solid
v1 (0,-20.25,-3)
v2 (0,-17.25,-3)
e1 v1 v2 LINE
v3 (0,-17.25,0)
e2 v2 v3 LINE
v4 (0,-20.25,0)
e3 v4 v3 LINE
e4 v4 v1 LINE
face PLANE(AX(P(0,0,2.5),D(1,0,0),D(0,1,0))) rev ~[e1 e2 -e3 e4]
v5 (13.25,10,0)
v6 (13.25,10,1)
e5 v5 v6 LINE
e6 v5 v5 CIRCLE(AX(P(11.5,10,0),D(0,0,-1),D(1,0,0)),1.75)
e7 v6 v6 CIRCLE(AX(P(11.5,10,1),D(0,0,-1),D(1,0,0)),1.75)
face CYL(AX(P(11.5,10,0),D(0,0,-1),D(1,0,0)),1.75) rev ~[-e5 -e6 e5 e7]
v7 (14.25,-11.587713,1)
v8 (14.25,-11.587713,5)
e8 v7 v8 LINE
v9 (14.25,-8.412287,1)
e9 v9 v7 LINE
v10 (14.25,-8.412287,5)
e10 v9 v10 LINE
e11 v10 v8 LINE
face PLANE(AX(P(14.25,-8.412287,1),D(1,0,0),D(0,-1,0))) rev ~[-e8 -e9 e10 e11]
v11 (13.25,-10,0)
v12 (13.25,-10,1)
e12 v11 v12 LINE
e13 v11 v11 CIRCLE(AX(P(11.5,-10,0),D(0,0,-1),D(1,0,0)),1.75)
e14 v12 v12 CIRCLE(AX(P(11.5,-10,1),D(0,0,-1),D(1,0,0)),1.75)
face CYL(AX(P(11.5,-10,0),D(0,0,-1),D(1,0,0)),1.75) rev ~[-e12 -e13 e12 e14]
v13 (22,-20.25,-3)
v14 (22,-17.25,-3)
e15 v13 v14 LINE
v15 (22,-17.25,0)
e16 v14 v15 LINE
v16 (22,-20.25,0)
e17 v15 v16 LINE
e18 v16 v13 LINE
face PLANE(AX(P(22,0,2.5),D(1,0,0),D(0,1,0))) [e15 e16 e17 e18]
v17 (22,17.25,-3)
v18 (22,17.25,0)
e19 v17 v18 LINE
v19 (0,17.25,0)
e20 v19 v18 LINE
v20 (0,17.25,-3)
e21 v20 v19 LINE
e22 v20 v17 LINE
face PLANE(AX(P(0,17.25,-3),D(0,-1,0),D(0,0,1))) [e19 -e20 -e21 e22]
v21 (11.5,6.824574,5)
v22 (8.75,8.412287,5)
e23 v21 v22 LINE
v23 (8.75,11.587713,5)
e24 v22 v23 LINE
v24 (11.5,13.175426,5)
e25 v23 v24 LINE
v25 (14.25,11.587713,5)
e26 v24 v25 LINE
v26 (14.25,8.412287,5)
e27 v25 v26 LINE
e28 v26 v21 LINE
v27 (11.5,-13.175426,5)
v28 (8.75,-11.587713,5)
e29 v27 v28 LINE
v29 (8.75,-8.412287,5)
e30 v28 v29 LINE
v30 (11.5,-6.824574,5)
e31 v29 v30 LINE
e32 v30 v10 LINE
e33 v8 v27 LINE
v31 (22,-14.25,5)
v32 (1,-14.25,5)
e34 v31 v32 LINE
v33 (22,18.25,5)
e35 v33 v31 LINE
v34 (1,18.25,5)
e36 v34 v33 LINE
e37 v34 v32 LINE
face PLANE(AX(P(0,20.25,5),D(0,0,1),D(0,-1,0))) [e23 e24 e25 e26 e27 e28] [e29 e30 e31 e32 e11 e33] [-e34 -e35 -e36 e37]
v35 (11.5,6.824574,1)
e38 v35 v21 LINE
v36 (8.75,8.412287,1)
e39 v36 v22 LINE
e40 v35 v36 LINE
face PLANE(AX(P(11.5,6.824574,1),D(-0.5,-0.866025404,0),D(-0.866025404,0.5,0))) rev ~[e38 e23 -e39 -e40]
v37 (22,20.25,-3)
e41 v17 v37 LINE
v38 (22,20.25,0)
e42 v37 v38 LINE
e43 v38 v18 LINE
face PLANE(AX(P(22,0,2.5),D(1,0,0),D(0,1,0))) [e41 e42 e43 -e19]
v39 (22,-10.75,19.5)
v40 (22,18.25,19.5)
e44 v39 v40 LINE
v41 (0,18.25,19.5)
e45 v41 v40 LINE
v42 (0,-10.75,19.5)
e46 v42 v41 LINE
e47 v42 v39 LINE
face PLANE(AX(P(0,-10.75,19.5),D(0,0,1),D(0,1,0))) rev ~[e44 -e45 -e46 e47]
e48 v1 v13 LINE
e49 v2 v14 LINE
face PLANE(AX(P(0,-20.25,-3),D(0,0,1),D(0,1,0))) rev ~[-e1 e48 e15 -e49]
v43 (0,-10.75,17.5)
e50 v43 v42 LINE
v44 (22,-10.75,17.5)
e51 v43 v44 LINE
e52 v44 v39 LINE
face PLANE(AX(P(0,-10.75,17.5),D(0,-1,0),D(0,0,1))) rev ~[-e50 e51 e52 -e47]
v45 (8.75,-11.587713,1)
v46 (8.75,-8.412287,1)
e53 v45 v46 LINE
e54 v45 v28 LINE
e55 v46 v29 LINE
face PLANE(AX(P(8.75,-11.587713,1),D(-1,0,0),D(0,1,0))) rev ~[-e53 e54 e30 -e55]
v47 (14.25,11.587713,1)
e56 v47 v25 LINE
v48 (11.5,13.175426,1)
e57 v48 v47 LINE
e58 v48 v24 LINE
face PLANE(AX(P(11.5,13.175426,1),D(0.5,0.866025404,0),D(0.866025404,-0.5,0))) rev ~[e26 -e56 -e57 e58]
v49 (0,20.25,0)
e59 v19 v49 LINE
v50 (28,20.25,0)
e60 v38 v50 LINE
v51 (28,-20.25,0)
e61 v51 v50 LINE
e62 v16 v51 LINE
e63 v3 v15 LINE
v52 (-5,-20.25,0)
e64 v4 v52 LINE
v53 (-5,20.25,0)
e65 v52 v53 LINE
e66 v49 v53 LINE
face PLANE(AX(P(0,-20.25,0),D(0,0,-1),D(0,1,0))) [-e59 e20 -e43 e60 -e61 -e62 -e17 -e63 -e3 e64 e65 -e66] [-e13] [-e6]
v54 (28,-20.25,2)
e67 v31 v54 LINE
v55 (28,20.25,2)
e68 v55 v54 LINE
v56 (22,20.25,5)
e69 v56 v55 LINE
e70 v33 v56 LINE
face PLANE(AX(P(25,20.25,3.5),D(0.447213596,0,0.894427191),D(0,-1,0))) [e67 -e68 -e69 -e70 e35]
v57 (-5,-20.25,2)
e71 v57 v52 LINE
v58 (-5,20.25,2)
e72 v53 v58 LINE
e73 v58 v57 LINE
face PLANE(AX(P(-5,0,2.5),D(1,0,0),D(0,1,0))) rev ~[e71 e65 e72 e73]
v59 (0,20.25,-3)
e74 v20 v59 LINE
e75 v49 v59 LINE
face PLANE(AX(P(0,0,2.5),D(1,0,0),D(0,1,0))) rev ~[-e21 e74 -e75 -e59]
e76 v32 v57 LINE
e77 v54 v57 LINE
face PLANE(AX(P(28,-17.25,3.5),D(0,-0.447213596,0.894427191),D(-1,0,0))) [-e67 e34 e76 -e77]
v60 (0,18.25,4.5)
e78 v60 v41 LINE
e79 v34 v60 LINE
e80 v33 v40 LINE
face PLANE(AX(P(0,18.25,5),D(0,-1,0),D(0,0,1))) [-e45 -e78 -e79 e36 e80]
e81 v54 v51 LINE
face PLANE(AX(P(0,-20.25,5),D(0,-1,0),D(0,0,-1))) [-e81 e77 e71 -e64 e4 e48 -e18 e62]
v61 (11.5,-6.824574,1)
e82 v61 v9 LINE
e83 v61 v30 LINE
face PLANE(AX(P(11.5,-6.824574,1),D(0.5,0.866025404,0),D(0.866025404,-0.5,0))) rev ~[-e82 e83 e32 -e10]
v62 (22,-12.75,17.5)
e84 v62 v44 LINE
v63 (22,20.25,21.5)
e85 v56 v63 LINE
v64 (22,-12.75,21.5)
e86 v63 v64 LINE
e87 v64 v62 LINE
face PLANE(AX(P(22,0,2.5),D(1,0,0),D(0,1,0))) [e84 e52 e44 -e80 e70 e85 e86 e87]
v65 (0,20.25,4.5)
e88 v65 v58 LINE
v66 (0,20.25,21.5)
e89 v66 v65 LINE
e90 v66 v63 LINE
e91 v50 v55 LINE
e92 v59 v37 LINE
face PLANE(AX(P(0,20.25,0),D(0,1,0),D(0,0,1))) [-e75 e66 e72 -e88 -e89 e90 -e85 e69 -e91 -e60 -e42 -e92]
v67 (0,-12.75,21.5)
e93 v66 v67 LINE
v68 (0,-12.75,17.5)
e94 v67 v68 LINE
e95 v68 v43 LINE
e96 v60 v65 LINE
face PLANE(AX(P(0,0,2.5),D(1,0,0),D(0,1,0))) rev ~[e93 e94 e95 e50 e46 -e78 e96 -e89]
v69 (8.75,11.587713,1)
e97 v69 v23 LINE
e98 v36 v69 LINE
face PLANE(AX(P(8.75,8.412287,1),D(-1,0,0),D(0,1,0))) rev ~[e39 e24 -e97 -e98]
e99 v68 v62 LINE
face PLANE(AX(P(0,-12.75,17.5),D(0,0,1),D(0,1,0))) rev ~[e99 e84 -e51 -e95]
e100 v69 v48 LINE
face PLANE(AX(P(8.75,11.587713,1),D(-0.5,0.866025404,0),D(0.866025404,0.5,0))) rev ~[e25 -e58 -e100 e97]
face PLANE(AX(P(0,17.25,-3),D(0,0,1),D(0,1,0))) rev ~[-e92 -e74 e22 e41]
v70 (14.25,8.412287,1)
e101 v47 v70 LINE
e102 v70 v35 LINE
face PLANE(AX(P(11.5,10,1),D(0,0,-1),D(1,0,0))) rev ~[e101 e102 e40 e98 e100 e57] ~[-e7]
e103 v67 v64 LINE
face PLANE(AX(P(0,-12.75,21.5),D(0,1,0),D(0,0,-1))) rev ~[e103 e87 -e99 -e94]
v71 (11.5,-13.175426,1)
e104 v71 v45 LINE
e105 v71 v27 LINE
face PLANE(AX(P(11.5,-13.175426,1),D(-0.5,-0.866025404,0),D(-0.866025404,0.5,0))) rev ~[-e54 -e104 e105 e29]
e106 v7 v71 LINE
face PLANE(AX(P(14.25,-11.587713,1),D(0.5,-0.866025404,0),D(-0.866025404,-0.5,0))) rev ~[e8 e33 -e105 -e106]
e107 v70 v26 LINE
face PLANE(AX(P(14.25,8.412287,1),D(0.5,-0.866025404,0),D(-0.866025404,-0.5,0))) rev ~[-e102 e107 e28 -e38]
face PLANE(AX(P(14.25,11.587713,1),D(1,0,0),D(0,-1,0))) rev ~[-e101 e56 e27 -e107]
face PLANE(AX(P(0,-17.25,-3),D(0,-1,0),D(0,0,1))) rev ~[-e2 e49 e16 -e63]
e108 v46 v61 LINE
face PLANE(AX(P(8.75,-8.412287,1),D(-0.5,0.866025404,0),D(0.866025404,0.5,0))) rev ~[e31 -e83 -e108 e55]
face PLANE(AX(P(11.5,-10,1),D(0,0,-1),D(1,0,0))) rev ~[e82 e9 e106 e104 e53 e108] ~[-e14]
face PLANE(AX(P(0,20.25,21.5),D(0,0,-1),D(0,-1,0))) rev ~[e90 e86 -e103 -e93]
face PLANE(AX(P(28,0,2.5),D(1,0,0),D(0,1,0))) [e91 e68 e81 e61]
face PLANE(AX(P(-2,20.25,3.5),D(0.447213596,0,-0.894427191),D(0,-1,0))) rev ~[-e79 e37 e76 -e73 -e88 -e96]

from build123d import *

# Parameters (mm, degrees)
F0_W          = 2
F0_H          = 14.5
F0_W_2        = 3
F0_H_2        = 3
F0_W_3        = 29
F0_H_3        = 2
F1_DEPTH      = 22
F2_DEPTH      = 28
F2_DEPTH_BACK = 5
F3_R          = 1.75
F4_DEPTH      = 5
F5_START      = -1
F5_DEPTH      = 4
F6_SIZE2      = 3
F6_SIZE       = 6


# Not quite as in the source:
# - a feature names something its author has since deleted; it is built from what else it names


with BuildPart() as f1:
    # F0 (on Right) → F1 (new body)
    with BuildSketch(Plane.YZ):
        Polygon((-20.25, 5), (-20.25, 0), (-17.25, 0), (17.25, 0), (20.25, 0), (20.25, 5), (18.25, 5), align=None)
        with Locations((19.25, 12.25)):
            Rectangle(F0_W, F0_H)
        with Locations((-18.75, -1.5)):
            Rectangle(F0_W_2, F0_H_2)
        with Locations((18.75, -1.5)):
            Rectangle(F0_W_2, F0_H_2)
        with Locations((3.75, 20.5)):
            Rectangle(F0_W_3, F0_H_3)
        with Locations((19.25, 20.5)):
            Rectangle(F0_W, F0_H_3)
        Polygon((-10.75, 17.5), (-10.75, 19.5), (-10.75, 21.5), (-12.75, 21.5), (-12.75, 17.5), align=None)
    extrude(amount=F1_DEPTH)

    # F0 (on Right) → F2 (join, two sides)
    with BuildSketch(Plane.YZ) as f2_sk:
        Polygon((-20.25, 5), (-20.25, 0), (-17.25, 0), (17.25, 0), (20.25, 0), (20.25, 5), (18.25, 5), align=None)
    extrude(amount=F2_DEPTH)
    extrude(f2_sk.sketch, amount=-F2_DEPTH_BACK)

    # F3 (on face) → F4 (cut, through all)
    with BuildSketch(Plane(origin=(0, 0, 0), x_dir=(1, 0, 0), z_dir=(0, 0, -1))):
        with Locations((11.5, 10)):
            Circle(F3_R)
        with Locations((11.5, -10)):
            Circle(F3_R)
    extrude(amount=-F4_DEPTH, mode=Mode.SUBTRACT)

    # F3 (on face) → F5 (cut)
    with BuildSketch(Plane(origin=(0, 0, 0), x_dir=(1, 0, 0), z_dir=(0, 0, -1)).offset(F5_START)):
        Polygon((8.75, -8.4122867597), (8.75, -11.5877132403), (11.5, -13.1754264805), (14.25, -11.5877132403), (14.25, -8.4122867597), (11.5, -6.8245735195), align=None)
        with Locations((11.5, -10)):
            Circle(F3_R, mode=Mode.SUBTRACT)
        Polygon((8.75, 11.5877132403), (8.75, 8.4122867597), (11.5, 6.8245735195), (14.25, 8.4122867597), (14.25, 11.5877132403), (11.5, 13.1754264805), align=None)
        with Locations((11.5, 10)):
            Circle(F3_R, mode=Mode.SUBTRACT)
    extrude(amount=-F5_DEPTH, mode=Mode.SUBTRACT)

    # F6
    f6_edges = [f1.edges().sort_by_distance(p)[0] for p in [
        (28, 0, 5),
        (11.5, -20.25, 5),
        (-5, 0, 5),
    ]]
    f6_side = f1.faces().sort_by_distance((11.51774, -0.683006, 5))[0]
    chamfer(f6_edges, length=F6_SIZE, length2=F6_SIZE2, reference=f6_side)


solid = f1.part
